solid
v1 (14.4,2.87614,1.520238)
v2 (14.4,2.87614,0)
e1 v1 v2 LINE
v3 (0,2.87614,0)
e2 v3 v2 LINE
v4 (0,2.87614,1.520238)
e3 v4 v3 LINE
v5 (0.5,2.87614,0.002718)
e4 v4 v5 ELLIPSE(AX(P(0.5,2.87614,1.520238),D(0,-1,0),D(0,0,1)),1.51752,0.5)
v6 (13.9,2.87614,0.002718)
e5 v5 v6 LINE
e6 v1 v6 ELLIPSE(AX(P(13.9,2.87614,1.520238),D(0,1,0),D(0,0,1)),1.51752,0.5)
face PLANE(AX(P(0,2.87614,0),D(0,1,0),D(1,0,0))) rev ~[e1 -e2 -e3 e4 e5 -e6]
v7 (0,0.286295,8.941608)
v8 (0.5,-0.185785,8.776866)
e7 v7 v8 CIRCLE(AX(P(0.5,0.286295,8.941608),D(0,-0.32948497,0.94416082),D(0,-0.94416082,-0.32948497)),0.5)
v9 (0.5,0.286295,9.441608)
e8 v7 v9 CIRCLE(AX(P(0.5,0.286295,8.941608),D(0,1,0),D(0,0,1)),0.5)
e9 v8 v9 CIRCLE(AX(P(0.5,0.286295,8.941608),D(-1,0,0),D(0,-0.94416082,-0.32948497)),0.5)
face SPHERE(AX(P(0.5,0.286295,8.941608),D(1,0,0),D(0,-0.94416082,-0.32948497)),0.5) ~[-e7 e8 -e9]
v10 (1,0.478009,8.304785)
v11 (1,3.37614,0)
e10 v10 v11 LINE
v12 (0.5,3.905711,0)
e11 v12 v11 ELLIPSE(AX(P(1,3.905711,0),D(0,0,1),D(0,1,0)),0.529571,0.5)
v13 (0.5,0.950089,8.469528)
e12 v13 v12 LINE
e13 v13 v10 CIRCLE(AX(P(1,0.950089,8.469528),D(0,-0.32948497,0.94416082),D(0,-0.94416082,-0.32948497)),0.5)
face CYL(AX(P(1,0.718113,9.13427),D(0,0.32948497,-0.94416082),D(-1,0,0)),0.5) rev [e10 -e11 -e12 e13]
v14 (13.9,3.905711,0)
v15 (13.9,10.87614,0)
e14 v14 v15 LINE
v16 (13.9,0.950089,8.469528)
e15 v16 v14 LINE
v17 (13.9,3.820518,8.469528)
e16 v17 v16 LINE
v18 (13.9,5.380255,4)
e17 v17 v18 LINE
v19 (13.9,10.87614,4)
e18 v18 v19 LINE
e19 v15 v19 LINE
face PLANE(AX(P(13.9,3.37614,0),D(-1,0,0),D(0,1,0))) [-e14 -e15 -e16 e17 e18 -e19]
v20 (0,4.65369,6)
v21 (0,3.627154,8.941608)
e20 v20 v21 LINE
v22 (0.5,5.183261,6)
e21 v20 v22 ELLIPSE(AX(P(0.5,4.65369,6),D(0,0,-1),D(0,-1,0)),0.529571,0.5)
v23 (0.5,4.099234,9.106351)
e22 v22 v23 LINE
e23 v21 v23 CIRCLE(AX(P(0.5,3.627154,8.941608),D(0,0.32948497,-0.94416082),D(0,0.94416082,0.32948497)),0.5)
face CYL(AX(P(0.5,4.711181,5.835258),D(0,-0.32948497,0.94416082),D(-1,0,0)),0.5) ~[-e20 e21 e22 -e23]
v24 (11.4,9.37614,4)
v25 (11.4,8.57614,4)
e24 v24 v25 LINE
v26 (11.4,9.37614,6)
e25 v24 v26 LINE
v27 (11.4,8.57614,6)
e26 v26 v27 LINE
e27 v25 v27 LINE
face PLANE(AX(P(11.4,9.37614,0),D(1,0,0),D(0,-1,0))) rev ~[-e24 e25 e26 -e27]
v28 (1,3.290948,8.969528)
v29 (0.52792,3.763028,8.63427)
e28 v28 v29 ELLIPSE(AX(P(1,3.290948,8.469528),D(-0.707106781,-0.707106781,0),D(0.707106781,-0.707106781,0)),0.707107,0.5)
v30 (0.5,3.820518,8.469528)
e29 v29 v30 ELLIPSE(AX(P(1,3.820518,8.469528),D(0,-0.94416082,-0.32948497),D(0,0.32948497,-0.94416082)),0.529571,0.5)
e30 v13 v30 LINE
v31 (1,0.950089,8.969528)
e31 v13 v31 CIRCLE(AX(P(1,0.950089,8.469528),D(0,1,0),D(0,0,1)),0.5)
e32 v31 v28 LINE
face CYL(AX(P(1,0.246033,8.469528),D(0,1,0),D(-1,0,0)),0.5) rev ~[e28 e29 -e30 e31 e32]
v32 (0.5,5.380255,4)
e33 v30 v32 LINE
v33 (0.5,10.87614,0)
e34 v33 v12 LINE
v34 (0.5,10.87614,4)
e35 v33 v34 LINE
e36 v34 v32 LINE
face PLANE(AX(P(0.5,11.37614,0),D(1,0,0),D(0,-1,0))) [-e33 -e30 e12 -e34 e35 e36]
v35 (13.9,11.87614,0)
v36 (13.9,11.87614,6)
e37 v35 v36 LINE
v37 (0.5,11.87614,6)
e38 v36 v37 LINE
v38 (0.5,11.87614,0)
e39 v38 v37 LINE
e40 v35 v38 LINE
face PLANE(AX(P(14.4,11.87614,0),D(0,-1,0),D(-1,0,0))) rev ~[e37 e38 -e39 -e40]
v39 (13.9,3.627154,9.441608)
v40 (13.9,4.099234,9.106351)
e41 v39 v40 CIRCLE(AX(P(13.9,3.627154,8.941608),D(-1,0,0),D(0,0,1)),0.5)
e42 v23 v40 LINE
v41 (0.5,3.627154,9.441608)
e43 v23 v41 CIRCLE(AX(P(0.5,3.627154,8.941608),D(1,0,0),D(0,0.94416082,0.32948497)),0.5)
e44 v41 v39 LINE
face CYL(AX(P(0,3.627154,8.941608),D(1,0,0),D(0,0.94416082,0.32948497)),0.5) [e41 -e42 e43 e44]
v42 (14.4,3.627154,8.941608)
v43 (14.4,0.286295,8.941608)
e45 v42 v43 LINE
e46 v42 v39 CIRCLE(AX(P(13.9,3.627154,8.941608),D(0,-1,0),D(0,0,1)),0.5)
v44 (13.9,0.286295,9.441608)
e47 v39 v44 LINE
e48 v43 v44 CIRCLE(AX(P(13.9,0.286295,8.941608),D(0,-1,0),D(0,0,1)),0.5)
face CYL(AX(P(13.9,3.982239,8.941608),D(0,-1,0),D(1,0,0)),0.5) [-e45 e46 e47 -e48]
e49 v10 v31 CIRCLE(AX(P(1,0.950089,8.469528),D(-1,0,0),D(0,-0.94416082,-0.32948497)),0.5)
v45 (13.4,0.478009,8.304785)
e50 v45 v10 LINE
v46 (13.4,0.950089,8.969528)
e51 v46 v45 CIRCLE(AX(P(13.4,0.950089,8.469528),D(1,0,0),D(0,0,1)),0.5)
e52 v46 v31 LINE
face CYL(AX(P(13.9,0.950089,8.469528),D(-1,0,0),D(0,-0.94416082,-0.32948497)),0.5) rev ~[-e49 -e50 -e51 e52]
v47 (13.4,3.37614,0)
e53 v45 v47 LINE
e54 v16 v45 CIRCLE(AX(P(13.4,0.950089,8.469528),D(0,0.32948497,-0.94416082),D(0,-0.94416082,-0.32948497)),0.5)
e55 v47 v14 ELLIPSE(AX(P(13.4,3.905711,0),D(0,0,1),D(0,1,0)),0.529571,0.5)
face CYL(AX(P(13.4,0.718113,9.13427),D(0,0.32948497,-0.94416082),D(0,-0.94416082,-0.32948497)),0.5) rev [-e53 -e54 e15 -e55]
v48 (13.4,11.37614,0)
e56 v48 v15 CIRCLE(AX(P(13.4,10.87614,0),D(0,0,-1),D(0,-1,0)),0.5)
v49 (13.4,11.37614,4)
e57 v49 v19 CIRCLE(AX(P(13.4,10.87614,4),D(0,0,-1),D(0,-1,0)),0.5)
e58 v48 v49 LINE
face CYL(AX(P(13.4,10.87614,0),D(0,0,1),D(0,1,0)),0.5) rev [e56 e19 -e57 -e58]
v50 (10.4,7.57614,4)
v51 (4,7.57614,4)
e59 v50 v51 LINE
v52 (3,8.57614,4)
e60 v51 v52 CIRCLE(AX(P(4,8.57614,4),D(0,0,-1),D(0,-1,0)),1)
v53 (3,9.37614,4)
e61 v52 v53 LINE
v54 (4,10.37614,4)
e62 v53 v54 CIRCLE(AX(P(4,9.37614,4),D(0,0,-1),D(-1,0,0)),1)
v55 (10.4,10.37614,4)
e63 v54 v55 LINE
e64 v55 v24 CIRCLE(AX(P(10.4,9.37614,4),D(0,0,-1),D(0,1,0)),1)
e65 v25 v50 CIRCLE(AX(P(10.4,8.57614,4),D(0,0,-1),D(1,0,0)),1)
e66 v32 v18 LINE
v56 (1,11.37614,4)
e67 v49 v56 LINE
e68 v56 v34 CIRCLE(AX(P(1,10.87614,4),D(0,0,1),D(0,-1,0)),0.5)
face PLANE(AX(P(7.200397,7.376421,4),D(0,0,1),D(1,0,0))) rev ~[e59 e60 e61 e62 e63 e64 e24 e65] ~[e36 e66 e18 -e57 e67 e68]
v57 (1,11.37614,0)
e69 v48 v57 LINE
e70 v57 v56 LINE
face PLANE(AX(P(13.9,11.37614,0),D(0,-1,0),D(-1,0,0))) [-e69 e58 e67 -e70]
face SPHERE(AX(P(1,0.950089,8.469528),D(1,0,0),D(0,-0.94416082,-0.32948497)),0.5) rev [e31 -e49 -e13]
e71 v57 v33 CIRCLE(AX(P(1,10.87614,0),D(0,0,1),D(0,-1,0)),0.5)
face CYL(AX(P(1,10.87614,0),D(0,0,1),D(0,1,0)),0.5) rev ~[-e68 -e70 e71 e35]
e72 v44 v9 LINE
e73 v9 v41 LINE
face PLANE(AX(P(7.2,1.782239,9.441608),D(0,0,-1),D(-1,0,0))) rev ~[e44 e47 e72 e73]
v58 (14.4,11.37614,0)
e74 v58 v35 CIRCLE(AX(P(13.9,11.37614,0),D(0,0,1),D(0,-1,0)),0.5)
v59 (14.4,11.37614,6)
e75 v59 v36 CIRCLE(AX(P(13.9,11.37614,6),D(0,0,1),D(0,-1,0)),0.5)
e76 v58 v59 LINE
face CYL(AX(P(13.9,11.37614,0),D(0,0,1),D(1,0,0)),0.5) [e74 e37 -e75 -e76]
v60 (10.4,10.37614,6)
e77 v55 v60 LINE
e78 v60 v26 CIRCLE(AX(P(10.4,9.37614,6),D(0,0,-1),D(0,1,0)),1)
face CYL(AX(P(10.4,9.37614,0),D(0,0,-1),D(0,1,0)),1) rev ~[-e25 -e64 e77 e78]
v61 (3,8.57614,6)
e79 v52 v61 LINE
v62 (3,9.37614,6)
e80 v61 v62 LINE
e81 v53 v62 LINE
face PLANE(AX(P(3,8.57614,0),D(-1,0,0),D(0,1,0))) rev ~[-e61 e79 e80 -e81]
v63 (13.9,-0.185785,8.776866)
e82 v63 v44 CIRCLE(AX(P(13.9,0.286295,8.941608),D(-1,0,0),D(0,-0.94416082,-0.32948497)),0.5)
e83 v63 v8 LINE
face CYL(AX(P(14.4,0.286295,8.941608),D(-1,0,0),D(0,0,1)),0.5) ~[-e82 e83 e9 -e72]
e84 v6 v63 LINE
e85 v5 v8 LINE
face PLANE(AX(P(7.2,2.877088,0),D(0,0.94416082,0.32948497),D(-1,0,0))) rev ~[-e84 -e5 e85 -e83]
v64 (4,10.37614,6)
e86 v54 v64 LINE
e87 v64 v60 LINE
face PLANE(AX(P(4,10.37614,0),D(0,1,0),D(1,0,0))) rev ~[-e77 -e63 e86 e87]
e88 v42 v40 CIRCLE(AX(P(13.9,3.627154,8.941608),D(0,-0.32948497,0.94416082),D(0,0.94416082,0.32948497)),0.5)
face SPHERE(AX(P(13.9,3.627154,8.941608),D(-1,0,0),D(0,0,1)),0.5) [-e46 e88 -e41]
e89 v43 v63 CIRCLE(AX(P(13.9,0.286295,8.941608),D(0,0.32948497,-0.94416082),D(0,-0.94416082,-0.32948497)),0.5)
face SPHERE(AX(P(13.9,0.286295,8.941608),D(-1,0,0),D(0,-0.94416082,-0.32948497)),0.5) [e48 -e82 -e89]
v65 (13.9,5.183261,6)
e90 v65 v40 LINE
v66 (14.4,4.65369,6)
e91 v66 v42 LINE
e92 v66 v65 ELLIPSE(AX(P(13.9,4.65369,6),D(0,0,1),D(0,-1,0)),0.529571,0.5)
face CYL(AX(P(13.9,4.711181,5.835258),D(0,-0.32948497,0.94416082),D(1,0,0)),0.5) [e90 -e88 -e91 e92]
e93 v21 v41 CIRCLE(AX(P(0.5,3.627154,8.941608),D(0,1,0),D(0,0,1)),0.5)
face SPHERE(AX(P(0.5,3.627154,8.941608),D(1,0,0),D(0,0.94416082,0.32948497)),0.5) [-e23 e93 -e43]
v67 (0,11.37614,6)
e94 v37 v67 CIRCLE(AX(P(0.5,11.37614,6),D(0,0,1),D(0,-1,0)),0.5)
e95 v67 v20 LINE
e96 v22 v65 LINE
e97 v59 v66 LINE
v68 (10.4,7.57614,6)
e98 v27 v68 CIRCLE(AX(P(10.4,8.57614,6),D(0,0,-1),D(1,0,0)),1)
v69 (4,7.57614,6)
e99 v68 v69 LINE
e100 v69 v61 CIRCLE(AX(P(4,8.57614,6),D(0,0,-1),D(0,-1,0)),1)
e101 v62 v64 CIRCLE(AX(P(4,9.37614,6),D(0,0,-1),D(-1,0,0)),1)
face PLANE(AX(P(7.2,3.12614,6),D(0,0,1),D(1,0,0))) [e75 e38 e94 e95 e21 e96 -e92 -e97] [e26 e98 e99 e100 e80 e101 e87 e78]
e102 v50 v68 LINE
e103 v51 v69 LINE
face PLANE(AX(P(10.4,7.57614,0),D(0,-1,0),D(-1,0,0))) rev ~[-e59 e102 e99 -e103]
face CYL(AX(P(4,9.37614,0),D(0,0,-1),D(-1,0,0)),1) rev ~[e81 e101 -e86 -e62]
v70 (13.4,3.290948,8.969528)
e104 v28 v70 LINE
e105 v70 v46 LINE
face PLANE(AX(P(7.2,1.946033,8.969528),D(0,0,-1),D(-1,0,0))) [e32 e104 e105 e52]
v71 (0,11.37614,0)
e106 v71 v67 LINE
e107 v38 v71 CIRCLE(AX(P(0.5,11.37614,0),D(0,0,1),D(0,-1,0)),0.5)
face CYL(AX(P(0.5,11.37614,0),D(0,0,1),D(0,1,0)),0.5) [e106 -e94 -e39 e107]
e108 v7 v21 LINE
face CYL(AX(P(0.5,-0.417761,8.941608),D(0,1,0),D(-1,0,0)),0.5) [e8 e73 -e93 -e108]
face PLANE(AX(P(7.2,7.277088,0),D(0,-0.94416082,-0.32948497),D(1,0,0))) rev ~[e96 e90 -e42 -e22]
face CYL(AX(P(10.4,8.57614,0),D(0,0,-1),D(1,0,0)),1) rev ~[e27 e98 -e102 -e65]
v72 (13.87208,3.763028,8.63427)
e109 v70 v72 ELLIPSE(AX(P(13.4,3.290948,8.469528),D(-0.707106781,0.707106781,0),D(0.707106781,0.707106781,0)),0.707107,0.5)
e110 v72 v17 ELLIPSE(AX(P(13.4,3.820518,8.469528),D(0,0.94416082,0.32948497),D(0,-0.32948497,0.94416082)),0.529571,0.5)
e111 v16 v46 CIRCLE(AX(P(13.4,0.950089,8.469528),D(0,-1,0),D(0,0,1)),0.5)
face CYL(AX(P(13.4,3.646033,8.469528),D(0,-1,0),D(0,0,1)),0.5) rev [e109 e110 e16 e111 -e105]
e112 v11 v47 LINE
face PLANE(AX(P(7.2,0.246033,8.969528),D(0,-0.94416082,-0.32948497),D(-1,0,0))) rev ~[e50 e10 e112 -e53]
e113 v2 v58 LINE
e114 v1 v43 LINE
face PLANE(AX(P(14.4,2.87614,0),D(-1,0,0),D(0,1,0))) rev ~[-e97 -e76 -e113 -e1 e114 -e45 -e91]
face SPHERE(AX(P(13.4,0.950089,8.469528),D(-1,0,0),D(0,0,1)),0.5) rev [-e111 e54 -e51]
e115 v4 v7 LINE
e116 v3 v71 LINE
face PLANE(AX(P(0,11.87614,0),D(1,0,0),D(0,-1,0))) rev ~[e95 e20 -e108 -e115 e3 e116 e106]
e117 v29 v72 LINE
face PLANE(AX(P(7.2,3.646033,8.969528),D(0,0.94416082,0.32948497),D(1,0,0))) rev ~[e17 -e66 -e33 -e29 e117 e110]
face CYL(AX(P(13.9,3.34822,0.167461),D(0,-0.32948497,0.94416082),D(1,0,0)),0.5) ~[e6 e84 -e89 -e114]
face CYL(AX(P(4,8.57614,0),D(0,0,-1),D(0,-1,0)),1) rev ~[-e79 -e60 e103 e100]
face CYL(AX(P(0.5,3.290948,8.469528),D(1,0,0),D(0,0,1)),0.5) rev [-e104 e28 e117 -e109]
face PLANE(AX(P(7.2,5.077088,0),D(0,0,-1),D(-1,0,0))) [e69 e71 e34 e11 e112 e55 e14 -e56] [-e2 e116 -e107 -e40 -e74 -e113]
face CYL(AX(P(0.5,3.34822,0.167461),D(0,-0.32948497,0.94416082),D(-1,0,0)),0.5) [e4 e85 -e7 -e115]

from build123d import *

# Parameters (mm, degrees)
F1_DEPTH = 6
F2_W     = 14.4
F2_H     = 4.4
F5_W     = 13.4
F5_H     = 3.4
F9_DEPTH = 4
F10_R    = 0.5


with BuildPart() as f1:
    # F0 (on Top) → F1 (new body)
    with BuildSketch(Plane.XY):
        Polygon((0, 2.8761399509), (0.5, 2.8761399509), (13.9, 2.8761399509), (14.4, 2.8761399509), (14.4, 3.3761399509), (0, 3.3761399509), align=None)
        Polygon((0, 10.3761399509), (0, 3.3761399509), (14.4, 3.3761399509), (14.4, 10.3761399509), (14.4, 11.8761399509), (12.9, 11.8761399509), (1.5, 11.8761399509), (0, 11.8761399509), align=None)
        with BuildLine():
            ThreePointArc((3, 9.3761399509), (3.2928932188, 10.0832467321), (4, 10.3761399509))
            Line((4, 10.3761399509), (10.4, 10.3761399509))
            ThreePointArc((10.4, 10.3761399509), (11.1071067812, 10.0832467321), (11.4, 9.3761399509))
            Line((11.4, 9.3761399509), (11.4, 8.5761399509))
            ThreePointArc((11.4, 8.5761399509), (11.1071067812, 7.8690331698), (10.4, 7.5761399509))
            Line((10.4, 7.5761399509), (4, 7.5761399509))
            ThreePointArc((4, 7.5761399509), (3.2928932188, 7.8690331698), (3, 8.5761399509))
            Line((3, 8.5761399509), (3, 9.3761399509))
        make_face(mode=Mode.SUBTRACT)
    extrude(amount=F1_DEPTH)

    # F4: sweep along a path in F3
    with BuildLine(Plane(origin=(0, 0, 0), x_dir=(0, -1, 0), z_dir=(-1, 0, 0))) as f4_path:
        Line((-2.8761399509, 0), (0.418709749, 9.4416082028))
    # F2 (on face) → F4 (sweep)
    with BuildSketch(Plane(origin=(0, 0, 0), x_dir=(1, 0, 0), z_dir=(0, 0, -1))):
        with Locations((7.2, -5.0770884661)):
            Rectangle(F2_W, F2_H)
    sweep(path=f4_path.line)

    # F7: sweep along a path in F6
    with BuildLine(Plane.YZ) as f7_path:
        Line((3.6174104522, 8.9695277927), (6.7475176671, 0))
    # F5 (on face) → F7 (sweep, cut)
    with BuildSketch(Plane(origin=(0, 0, 0), x_dir=(1, 0, 0), z_dir=(0, 0, -1))):
        with Locations((7.2, -5.0761399509)):
            Rectangle(F5_W, F5_H)
    sweep(path=f7_path.line, mode=Mode.SUBTRACT)

    # F8 (on Top) → F9 (cut)
    with BuildSketch(Plane.XY):
        Polygon((13.9, 11.3761399509), (12.4, 11.3761399509), (2, 11.3761399509), (0.5, 11.3761399509), (0.5, 9.8761399509), (0.5, 4.8761399509), (0.5, 3.3786750864), (2, 3.3761399509), (12.4, 3.3761399509), (13.9, 3.3761399509), (13.9, 4.8761399509), (13.9, 9.8761399509), align=None)
    extrude(amount=F9_DEPTH, mode=Mode.SUBTRACT)

    # F10
    f10_edges = [f1.edges().sort_by_distance(p)[0] for p in [
        (0, 1.782239, 9.441608),
        (7.2, 3.982239, 9.441608),
        (14.4, 1.782239, 9.441608),
        (7.2, -0.417761, 9.441608),
        (14.4, 11.87614, 3),
        (0, 11.87614, 3),
        (0.5, 11.37614, 2),
        (13.9, 11.37614, 2),
        (0.5, 1.811086, 4.484764),
        (13.9, 1.811086, 4.484764),
        (0, 4.58275, 7.720804),
        (0, 1.229189, 4.722163),
        (14.4, 4.58275, 7.720804),
        (0.5, 1.946033, 8.969528),
        (7.2, 0.246033, 8.969528),
        (7.2, 3.646033, 8.969528),
        (13.9, 1.946033, 8.969528),
        (14.4, 1.229189, 4.722163),
    ]]
    fillet(f10_edges, radius=F10_R)


solid = f1.part
